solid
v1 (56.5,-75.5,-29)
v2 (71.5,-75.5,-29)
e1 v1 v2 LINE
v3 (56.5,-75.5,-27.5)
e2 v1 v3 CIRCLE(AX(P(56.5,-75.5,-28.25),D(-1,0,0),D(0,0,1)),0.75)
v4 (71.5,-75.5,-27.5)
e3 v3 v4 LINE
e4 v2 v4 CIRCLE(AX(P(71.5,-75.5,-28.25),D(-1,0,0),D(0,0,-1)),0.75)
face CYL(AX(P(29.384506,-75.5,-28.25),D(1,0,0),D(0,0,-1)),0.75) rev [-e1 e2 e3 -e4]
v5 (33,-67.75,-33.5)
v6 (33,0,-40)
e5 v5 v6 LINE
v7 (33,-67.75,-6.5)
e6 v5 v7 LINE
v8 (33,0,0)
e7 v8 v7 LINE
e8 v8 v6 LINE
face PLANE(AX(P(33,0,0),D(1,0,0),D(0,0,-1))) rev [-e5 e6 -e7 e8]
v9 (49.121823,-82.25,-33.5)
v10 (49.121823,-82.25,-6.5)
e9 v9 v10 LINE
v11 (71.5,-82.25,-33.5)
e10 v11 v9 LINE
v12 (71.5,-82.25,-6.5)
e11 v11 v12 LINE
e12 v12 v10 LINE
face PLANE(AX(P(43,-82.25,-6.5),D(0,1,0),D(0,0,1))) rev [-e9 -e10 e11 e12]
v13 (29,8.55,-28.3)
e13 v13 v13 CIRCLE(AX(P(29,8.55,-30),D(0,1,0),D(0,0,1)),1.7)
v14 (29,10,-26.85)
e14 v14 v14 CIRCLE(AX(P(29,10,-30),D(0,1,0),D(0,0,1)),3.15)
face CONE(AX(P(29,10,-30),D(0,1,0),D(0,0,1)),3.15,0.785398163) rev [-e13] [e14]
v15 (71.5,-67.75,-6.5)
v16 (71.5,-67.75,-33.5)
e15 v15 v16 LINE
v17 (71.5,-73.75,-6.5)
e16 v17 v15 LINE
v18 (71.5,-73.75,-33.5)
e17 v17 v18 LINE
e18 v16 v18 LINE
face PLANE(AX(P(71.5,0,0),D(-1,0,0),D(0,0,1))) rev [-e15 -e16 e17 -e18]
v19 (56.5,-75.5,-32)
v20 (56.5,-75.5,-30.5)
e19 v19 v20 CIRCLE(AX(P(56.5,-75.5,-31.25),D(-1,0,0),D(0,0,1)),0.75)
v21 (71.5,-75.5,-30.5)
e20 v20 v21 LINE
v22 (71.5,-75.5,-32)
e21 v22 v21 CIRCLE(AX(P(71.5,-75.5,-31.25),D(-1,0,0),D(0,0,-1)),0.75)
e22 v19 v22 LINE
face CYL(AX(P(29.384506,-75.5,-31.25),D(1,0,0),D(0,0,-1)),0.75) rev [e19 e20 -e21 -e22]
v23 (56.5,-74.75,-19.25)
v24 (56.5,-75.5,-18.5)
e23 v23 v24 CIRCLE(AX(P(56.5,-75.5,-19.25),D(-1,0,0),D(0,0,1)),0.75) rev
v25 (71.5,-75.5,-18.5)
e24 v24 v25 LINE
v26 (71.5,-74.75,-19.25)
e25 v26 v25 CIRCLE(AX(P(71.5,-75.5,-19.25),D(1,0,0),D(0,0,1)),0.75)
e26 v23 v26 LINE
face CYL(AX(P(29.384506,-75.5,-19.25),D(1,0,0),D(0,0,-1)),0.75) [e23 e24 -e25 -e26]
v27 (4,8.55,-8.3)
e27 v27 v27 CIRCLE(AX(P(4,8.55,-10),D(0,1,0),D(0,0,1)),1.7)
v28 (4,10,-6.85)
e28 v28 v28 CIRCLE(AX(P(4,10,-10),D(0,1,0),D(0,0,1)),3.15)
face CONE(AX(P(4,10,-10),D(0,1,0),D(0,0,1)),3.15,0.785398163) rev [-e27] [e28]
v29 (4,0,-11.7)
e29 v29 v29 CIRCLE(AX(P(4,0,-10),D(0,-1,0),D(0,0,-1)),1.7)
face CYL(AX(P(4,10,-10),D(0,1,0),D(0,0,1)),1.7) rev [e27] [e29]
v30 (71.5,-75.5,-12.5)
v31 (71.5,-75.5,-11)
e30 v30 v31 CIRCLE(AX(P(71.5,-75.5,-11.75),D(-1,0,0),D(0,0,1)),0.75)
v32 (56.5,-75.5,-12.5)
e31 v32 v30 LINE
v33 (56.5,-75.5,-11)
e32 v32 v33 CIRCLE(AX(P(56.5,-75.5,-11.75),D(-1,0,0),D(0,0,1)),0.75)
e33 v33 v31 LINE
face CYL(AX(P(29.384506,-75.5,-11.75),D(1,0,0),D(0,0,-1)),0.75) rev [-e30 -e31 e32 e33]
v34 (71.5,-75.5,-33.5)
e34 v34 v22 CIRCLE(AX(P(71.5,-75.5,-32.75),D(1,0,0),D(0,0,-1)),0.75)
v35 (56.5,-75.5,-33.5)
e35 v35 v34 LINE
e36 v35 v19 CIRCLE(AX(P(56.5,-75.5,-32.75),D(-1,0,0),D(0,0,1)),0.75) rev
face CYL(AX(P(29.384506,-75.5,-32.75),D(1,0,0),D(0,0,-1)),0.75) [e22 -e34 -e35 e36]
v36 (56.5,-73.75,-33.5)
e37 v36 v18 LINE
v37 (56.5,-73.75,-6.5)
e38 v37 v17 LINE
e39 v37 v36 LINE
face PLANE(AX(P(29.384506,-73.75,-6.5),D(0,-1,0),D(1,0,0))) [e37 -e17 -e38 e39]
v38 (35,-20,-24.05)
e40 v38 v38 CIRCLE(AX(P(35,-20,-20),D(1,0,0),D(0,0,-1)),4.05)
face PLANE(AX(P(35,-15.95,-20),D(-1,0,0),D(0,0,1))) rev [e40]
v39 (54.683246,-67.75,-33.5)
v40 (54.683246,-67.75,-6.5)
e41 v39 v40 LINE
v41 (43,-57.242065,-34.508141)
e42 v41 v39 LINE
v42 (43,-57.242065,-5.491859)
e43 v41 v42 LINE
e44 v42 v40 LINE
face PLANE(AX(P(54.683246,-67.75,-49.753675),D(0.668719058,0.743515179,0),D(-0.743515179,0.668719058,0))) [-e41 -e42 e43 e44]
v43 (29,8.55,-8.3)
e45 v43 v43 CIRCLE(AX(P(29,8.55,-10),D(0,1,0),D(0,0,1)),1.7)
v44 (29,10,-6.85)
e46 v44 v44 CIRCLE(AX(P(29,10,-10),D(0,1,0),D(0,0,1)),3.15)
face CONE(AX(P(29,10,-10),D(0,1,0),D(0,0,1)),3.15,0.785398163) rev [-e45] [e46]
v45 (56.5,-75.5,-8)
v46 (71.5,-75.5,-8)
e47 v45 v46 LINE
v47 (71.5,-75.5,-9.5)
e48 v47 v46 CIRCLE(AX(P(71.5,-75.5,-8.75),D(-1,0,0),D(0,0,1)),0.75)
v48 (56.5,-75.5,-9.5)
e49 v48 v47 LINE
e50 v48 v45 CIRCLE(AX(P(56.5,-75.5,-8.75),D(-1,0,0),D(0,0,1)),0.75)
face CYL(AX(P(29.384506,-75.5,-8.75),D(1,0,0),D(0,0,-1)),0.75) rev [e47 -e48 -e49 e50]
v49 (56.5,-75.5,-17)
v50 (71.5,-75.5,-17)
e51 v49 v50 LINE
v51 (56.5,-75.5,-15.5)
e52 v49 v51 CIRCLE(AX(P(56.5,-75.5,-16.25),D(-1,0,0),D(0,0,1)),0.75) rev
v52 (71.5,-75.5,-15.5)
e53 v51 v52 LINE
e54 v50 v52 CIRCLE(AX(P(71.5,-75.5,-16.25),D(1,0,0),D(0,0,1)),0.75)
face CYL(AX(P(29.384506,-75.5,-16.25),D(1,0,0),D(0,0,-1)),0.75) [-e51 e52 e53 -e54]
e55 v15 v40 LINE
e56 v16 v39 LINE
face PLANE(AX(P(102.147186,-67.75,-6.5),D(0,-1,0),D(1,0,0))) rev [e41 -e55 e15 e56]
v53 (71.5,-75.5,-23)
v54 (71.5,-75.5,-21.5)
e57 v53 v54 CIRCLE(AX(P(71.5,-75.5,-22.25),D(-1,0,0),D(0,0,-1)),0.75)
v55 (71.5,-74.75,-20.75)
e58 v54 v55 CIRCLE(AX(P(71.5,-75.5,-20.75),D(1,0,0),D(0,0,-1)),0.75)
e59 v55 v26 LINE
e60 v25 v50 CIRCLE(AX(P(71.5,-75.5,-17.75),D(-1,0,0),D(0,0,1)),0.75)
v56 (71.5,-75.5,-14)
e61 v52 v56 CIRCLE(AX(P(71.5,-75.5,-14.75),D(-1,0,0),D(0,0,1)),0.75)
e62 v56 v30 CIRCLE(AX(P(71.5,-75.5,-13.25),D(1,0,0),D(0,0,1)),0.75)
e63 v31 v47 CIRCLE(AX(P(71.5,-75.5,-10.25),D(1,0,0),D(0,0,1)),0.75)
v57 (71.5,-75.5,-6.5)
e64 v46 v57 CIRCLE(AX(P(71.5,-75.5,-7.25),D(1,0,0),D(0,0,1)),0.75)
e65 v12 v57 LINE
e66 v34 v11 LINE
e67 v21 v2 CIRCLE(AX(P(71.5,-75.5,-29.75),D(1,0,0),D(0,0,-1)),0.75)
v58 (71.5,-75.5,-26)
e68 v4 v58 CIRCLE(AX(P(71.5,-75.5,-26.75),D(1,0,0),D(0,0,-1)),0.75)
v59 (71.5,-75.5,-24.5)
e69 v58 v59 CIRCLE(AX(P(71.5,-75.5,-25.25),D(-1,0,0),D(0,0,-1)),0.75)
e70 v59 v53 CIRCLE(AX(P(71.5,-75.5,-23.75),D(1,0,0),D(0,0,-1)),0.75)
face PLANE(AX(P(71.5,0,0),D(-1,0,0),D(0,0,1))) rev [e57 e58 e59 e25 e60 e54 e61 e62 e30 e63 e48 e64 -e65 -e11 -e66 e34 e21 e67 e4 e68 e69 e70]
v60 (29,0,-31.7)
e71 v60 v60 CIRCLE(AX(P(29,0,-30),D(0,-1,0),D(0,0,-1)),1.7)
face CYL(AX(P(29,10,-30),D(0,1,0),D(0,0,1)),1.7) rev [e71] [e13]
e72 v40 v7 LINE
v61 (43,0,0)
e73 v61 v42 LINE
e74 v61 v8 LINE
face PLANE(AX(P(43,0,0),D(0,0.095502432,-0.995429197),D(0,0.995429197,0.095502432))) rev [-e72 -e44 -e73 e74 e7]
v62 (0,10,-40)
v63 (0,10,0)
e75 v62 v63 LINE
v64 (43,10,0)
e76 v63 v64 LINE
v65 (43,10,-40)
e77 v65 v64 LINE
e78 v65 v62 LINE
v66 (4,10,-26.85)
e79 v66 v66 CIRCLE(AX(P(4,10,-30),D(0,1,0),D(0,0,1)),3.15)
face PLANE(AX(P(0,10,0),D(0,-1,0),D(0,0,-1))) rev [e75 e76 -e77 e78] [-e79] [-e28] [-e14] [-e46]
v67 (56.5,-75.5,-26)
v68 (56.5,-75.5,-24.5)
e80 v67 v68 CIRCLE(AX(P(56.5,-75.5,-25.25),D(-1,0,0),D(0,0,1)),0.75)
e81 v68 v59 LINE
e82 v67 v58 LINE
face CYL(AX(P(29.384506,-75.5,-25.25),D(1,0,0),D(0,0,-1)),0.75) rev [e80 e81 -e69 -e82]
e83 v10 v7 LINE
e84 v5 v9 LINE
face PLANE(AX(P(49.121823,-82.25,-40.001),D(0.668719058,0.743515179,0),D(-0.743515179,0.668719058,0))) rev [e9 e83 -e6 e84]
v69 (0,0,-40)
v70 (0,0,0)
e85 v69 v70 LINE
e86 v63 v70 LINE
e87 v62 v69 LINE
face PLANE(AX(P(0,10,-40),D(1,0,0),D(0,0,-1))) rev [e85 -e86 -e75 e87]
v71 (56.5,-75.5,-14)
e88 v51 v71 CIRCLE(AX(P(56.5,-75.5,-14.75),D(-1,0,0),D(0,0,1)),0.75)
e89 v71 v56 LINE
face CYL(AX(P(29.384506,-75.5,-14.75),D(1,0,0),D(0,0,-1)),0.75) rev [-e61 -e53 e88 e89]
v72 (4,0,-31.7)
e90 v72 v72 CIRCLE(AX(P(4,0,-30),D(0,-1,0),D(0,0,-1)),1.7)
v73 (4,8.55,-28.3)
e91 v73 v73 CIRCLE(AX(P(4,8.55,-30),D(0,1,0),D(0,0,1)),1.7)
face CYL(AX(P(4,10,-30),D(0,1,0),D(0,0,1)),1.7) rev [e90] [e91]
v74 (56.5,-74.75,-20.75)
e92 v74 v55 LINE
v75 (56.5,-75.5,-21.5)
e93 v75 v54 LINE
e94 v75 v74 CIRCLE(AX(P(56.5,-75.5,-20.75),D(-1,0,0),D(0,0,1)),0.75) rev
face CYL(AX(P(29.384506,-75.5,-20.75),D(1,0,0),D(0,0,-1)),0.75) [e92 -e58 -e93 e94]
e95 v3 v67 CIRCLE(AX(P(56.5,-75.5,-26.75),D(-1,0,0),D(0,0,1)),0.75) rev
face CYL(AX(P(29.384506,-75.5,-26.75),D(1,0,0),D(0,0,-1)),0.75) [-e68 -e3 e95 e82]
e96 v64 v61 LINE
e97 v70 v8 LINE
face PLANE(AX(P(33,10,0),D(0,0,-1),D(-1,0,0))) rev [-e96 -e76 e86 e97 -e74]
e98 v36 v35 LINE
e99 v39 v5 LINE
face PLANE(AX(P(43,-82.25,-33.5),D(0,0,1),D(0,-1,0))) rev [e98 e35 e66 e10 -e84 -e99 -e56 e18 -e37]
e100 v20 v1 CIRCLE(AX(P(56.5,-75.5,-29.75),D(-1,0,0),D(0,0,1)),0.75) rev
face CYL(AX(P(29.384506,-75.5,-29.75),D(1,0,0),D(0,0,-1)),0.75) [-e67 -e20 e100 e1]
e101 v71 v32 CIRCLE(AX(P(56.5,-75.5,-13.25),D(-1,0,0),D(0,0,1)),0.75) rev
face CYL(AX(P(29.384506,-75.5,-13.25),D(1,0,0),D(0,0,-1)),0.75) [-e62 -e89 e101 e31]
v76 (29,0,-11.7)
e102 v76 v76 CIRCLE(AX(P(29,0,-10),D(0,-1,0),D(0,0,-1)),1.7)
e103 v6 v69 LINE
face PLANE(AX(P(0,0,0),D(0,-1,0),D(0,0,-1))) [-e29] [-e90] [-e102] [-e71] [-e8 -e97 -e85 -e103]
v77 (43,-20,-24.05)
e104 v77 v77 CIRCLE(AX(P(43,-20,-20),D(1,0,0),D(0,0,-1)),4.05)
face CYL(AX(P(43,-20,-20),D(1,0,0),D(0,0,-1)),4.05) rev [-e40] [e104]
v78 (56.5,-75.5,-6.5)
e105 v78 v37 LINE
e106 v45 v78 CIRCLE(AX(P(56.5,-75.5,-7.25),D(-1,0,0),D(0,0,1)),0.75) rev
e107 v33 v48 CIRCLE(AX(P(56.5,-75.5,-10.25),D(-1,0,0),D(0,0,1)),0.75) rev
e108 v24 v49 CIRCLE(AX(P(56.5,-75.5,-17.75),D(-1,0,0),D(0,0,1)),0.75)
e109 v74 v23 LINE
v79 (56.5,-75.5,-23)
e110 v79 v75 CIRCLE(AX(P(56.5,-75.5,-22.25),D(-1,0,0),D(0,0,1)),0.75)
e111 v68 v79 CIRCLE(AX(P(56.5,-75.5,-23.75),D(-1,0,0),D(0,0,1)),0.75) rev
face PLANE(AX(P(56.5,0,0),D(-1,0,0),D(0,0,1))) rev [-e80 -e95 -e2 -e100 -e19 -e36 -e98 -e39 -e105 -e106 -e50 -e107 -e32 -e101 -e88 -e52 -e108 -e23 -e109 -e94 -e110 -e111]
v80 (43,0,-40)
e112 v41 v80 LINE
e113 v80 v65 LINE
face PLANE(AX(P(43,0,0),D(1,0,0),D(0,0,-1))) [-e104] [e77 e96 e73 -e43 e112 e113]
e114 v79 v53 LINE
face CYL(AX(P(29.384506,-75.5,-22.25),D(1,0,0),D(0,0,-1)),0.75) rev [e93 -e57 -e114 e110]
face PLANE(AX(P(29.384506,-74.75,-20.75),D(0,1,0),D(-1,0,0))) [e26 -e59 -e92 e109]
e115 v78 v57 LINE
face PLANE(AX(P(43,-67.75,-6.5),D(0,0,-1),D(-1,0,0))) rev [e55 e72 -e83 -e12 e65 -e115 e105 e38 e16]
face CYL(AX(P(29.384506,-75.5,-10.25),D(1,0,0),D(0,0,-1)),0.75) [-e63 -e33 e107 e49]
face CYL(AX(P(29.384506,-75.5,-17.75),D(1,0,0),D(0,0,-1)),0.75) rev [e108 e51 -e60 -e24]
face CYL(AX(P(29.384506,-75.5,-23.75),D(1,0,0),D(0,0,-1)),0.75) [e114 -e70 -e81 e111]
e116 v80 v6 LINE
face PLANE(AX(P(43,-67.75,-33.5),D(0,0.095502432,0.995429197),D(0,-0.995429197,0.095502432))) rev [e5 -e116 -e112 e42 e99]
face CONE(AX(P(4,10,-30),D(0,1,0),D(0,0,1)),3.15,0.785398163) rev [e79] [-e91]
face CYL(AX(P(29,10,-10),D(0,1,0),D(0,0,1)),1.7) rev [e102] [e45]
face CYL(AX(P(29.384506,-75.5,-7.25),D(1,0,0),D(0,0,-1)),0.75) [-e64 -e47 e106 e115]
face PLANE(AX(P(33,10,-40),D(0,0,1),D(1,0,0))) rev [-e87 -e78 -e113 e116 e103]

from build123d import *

# Parameters (mm, degrees)
SKETCH_1_W                   = 33
SKETCH_1_H                   = 40
EXTRUDE_1_DEPTH              = 10
EXTRUDE_2_DEPTH              = 10
SKETCH_3_W                   = 27
SKETCH_3_H                   = 14.5
EXTRUDE_3_DEPTH              = 28.5
CUT_EXTRUDE_1_DEPTH          = 15
CUT_EXTRUDE_2_REACH          = 116.016
EXTRUDE_4_REACH              = 116.016
EXTRUDE_5_REACH              = 116.016
HOLE_WIZARD_M3_1_D           = 3.4
HOLE_WIZARD_M3_1_CSINK_D     = 6.3
HOLE_WIZARD_M3_1_CSINK_ANGLE = 90
OTHER_START                  = 35
OTHER_1_OUTLINE_R            = 4.05
OTHER_1_DEPTH                = 8


# Read off the part's stored shape, not the designer's step: 高级异型孔1
with BuildPart() as part:
    # 草图1 → 凸台-拉伸1 (new body)
    with BuildSketch(Plane(origin=(0, 0, 0), x_dir=(1, 0, 0), z_dir=(0, 1, 0))):
        with Locations((16.5, 20)):
            Rectangle(SKETCH_1_W, SKETCH_1_H)
    extrude(amount=EXTRUDE_1_DEPTH)

    # 草图2 → 凸台-拉伸2 (add)
    with BuildSketch(Plane(origin=(33, 0, 0), x_dir=(0, 0, -1), z_dir=(1, 0, 0))):
        Polygon((0, 0), (6.5, -67.75), (6.5, -82.25), (33.5, -82.25), (33.5, -67.75), (40, 0), (40, 10), (0, 10), align=None)
    extrude(amount=EXTRUDE_2_DEPTH)

    # 草图3 → 凸台-拉伸3 (add)
    with BuildSketch(Plane(origin=(43, 0, 0), x_dir=(0, 0, -1), z_dir=(1, 0, 0))):
        with Locations((20, -75)):
            Rectangle(SKETCH_3_W, SKETCH_3_H)
    extrude(amount=EXTRUDE_3_DEPTH)

    # 草图4 → 切除-拉伸1 (cut)
    with BuildSketch(Plane.ZY.offset(-71.5)):
        with BuildLine():
            Line((-6.5, -75.5), (-6.5, -73.75))
            Line((-6.5, -73.75), (-33.5, -73.75))
            Line((-33.5, -73.75), (-33.5, -75.5))
            ThreePointArc((-33.5, -75.5), (-32.75, -74.75), (-32, -75.5))
            ThreePointArc((-32, -75.5), (-31.25, -76.25), (-30.5, -75.5))
            ThreePointArc((-30.5, -75.5), (-29.75, -74.75), (-29, -75.5))
            ThreePointArc((-29, -75.5), (-28.25, -76.25), (-27.5, -75.5))
            ThreePointArc((-27.5, -75.5), (-26.75, -74.75), (-26, -75.5))
            ThreePointArc((-26, -75.5), (-25.25, -76.25), (-24.5, -75.5))
            ThreePointArc((-24.5, -75.5), (-23.75, -74.75), (-23, -75.5))
            ThreePointArc((-23, -75.5), (-22.25, -76.25), (-21.5, -75.5))
            ThreePointArc((-21.5, -75.5), (-21.280330086, -74.969669914), (-20.75, -74.75))
            Line((-20.75, -74.75), (-19.25, -74.75))
            ThreePointArc((-19.25, -74.75), (-18.719669914, -74.969669914), (-18.5, -75.5))
            ThreePointArc((-18.5, -75.5), (-17.75, -76.25), (-17, -75.5))
            ThreePointArc((-17, -75.5), (-16.25, -74.75), (-15.5, -75.5))
            ThreePointArc((-15.5, -75.5), (-14.75, -76.25), (-14, -75.5))
            ThreePointArc((-14, -75.5), (-13.25, -74.75), (-12.5, -75.5))
            ThreePointArc((-12.5, -75.5), (-11.75, -76.25), (-11, -75.5))
            ThreePointArc((-11, -75.5), (-10.25, -74.75), (-9.5, -75.5))
            ThreePointArc((-9.5, -75.5), (-8.75, -76.25), (-8, -75.5))
            ThreePointArc((-8, -75.5), (-7.25, -74.75), (-6.5, -75.5))
        make_face()
    extrude(amount=CUT_EXTRUDE_1_DEPTH, mode=Mode.SUBTRACT)

    # 草图5 → 切除-拉伸2 (cut, up to next)
    with BuildSketch(Plane.XY.offset(-6.5), mode=Mode.PRIVATE) as cut_extrude_2_sk1:
        Polygon((33, -82.25), (49.121822718, -82.25), (33, -67.75), align=None)
    cut_extrude_2_tool1 = extrude(cut_extrude_2_sk1.sketch, amount=-CUT_EXTRUDE_2_REACH, mode=Mode.PRIVATE) & part.part
    add(cut_extrude_2_tool1.solids().sort_by_distance((38.373941, -77.416667, -6.5))[0], mode=Mode.SUBTRACT)

    # 凸台-拉伸4: up to this plane
    extrude_4_end = Plane(origin=(43, -67.75, -33.5), z_dir=(0, 0.09550243214662471, 0.9954291966052028))
    # 草图6 → 凸台-拉伸4 (add, up to the surface)
    with BuildSketch(Plane.XY.offset(-6.5), mode=Mode.PRIVATE) as extrude_4_sk1:
        Polygon((43, -57.242064668), (43, -67.75), (54.683246246, -67.75), align=None)
    extrude_4_tool1 = split(extrude(extrude_4_sk1.sketch, amount=-EXTRUDE_4_REACH, mode=Mode.PRIVATE), bisect_by=extrude_4_end, keep=Keep.BOTH, mode=Mode.PRIVATE)
    add(extrude_4_tool1.solids().sort_by_distance((46.894415, -64.247355, -6.5))[0])

    # 凸台-拉伸5: up to this face of the body (flat: up to its plane)
    extrude_5_end = Plane(part.part.faces().sort_by_distance((38, -33.875, -3.25))[0])
    # 草图6<2> → 凸台-拉伸5 (add, up to the picked face)
    with BuildSketch(Plane.XY.offset(-6.5), mode=Mode.PRIVATE) as extrude_5_sk1:
        Polygon((43, -57.242064668), (43, -67.75), (54.683246246, -67.75), align=None)
    extrude_5_tool1 = split(extrude(extrude_5_sk1.sketch, amount=EXTRUDE_5_REACH, mode=Mode.PRIVATE), bisect_by=extrude_5_end, keep=Keep.BOTH, mode=Mode.PRIVATE)
    add(extrude_5_tool1.solids().sort_by(Axis((46.894415, -64.247355, -6.5), (0, 0, 1)))[0])

    # M3 平头机械螺钉的锥形沉头孔1 (through all)
    with Locations(Plane(origin=(0, 10, 0), x_dir=(1, 0, 0), z_dir=(0, 1, 0))):
        with Locations((29, 30), (4, 30), (4, 10), (29, 10)):
            CounterSinkHole(HOLE_WIZARD_M3_1_D / 2, HOLE_WIZARD_M3_1_CSINK_D / 2, counter_sink_angle=HOLE_WIZARD_M3_1_CSINK_ANGLE)

    # 高级异型孔1 outline → 高级异型孔1 (cut)
    with BuildSketch(Plane.YZ.offset(OTHER_START)):
        with Locations((-20, -20)):
            Circle(OTHER_1_OUTLINE_R)
    extrude(amount=OTHER_1_DEPTH, mode=Mode.SUBTRACT)


solid = part.part
